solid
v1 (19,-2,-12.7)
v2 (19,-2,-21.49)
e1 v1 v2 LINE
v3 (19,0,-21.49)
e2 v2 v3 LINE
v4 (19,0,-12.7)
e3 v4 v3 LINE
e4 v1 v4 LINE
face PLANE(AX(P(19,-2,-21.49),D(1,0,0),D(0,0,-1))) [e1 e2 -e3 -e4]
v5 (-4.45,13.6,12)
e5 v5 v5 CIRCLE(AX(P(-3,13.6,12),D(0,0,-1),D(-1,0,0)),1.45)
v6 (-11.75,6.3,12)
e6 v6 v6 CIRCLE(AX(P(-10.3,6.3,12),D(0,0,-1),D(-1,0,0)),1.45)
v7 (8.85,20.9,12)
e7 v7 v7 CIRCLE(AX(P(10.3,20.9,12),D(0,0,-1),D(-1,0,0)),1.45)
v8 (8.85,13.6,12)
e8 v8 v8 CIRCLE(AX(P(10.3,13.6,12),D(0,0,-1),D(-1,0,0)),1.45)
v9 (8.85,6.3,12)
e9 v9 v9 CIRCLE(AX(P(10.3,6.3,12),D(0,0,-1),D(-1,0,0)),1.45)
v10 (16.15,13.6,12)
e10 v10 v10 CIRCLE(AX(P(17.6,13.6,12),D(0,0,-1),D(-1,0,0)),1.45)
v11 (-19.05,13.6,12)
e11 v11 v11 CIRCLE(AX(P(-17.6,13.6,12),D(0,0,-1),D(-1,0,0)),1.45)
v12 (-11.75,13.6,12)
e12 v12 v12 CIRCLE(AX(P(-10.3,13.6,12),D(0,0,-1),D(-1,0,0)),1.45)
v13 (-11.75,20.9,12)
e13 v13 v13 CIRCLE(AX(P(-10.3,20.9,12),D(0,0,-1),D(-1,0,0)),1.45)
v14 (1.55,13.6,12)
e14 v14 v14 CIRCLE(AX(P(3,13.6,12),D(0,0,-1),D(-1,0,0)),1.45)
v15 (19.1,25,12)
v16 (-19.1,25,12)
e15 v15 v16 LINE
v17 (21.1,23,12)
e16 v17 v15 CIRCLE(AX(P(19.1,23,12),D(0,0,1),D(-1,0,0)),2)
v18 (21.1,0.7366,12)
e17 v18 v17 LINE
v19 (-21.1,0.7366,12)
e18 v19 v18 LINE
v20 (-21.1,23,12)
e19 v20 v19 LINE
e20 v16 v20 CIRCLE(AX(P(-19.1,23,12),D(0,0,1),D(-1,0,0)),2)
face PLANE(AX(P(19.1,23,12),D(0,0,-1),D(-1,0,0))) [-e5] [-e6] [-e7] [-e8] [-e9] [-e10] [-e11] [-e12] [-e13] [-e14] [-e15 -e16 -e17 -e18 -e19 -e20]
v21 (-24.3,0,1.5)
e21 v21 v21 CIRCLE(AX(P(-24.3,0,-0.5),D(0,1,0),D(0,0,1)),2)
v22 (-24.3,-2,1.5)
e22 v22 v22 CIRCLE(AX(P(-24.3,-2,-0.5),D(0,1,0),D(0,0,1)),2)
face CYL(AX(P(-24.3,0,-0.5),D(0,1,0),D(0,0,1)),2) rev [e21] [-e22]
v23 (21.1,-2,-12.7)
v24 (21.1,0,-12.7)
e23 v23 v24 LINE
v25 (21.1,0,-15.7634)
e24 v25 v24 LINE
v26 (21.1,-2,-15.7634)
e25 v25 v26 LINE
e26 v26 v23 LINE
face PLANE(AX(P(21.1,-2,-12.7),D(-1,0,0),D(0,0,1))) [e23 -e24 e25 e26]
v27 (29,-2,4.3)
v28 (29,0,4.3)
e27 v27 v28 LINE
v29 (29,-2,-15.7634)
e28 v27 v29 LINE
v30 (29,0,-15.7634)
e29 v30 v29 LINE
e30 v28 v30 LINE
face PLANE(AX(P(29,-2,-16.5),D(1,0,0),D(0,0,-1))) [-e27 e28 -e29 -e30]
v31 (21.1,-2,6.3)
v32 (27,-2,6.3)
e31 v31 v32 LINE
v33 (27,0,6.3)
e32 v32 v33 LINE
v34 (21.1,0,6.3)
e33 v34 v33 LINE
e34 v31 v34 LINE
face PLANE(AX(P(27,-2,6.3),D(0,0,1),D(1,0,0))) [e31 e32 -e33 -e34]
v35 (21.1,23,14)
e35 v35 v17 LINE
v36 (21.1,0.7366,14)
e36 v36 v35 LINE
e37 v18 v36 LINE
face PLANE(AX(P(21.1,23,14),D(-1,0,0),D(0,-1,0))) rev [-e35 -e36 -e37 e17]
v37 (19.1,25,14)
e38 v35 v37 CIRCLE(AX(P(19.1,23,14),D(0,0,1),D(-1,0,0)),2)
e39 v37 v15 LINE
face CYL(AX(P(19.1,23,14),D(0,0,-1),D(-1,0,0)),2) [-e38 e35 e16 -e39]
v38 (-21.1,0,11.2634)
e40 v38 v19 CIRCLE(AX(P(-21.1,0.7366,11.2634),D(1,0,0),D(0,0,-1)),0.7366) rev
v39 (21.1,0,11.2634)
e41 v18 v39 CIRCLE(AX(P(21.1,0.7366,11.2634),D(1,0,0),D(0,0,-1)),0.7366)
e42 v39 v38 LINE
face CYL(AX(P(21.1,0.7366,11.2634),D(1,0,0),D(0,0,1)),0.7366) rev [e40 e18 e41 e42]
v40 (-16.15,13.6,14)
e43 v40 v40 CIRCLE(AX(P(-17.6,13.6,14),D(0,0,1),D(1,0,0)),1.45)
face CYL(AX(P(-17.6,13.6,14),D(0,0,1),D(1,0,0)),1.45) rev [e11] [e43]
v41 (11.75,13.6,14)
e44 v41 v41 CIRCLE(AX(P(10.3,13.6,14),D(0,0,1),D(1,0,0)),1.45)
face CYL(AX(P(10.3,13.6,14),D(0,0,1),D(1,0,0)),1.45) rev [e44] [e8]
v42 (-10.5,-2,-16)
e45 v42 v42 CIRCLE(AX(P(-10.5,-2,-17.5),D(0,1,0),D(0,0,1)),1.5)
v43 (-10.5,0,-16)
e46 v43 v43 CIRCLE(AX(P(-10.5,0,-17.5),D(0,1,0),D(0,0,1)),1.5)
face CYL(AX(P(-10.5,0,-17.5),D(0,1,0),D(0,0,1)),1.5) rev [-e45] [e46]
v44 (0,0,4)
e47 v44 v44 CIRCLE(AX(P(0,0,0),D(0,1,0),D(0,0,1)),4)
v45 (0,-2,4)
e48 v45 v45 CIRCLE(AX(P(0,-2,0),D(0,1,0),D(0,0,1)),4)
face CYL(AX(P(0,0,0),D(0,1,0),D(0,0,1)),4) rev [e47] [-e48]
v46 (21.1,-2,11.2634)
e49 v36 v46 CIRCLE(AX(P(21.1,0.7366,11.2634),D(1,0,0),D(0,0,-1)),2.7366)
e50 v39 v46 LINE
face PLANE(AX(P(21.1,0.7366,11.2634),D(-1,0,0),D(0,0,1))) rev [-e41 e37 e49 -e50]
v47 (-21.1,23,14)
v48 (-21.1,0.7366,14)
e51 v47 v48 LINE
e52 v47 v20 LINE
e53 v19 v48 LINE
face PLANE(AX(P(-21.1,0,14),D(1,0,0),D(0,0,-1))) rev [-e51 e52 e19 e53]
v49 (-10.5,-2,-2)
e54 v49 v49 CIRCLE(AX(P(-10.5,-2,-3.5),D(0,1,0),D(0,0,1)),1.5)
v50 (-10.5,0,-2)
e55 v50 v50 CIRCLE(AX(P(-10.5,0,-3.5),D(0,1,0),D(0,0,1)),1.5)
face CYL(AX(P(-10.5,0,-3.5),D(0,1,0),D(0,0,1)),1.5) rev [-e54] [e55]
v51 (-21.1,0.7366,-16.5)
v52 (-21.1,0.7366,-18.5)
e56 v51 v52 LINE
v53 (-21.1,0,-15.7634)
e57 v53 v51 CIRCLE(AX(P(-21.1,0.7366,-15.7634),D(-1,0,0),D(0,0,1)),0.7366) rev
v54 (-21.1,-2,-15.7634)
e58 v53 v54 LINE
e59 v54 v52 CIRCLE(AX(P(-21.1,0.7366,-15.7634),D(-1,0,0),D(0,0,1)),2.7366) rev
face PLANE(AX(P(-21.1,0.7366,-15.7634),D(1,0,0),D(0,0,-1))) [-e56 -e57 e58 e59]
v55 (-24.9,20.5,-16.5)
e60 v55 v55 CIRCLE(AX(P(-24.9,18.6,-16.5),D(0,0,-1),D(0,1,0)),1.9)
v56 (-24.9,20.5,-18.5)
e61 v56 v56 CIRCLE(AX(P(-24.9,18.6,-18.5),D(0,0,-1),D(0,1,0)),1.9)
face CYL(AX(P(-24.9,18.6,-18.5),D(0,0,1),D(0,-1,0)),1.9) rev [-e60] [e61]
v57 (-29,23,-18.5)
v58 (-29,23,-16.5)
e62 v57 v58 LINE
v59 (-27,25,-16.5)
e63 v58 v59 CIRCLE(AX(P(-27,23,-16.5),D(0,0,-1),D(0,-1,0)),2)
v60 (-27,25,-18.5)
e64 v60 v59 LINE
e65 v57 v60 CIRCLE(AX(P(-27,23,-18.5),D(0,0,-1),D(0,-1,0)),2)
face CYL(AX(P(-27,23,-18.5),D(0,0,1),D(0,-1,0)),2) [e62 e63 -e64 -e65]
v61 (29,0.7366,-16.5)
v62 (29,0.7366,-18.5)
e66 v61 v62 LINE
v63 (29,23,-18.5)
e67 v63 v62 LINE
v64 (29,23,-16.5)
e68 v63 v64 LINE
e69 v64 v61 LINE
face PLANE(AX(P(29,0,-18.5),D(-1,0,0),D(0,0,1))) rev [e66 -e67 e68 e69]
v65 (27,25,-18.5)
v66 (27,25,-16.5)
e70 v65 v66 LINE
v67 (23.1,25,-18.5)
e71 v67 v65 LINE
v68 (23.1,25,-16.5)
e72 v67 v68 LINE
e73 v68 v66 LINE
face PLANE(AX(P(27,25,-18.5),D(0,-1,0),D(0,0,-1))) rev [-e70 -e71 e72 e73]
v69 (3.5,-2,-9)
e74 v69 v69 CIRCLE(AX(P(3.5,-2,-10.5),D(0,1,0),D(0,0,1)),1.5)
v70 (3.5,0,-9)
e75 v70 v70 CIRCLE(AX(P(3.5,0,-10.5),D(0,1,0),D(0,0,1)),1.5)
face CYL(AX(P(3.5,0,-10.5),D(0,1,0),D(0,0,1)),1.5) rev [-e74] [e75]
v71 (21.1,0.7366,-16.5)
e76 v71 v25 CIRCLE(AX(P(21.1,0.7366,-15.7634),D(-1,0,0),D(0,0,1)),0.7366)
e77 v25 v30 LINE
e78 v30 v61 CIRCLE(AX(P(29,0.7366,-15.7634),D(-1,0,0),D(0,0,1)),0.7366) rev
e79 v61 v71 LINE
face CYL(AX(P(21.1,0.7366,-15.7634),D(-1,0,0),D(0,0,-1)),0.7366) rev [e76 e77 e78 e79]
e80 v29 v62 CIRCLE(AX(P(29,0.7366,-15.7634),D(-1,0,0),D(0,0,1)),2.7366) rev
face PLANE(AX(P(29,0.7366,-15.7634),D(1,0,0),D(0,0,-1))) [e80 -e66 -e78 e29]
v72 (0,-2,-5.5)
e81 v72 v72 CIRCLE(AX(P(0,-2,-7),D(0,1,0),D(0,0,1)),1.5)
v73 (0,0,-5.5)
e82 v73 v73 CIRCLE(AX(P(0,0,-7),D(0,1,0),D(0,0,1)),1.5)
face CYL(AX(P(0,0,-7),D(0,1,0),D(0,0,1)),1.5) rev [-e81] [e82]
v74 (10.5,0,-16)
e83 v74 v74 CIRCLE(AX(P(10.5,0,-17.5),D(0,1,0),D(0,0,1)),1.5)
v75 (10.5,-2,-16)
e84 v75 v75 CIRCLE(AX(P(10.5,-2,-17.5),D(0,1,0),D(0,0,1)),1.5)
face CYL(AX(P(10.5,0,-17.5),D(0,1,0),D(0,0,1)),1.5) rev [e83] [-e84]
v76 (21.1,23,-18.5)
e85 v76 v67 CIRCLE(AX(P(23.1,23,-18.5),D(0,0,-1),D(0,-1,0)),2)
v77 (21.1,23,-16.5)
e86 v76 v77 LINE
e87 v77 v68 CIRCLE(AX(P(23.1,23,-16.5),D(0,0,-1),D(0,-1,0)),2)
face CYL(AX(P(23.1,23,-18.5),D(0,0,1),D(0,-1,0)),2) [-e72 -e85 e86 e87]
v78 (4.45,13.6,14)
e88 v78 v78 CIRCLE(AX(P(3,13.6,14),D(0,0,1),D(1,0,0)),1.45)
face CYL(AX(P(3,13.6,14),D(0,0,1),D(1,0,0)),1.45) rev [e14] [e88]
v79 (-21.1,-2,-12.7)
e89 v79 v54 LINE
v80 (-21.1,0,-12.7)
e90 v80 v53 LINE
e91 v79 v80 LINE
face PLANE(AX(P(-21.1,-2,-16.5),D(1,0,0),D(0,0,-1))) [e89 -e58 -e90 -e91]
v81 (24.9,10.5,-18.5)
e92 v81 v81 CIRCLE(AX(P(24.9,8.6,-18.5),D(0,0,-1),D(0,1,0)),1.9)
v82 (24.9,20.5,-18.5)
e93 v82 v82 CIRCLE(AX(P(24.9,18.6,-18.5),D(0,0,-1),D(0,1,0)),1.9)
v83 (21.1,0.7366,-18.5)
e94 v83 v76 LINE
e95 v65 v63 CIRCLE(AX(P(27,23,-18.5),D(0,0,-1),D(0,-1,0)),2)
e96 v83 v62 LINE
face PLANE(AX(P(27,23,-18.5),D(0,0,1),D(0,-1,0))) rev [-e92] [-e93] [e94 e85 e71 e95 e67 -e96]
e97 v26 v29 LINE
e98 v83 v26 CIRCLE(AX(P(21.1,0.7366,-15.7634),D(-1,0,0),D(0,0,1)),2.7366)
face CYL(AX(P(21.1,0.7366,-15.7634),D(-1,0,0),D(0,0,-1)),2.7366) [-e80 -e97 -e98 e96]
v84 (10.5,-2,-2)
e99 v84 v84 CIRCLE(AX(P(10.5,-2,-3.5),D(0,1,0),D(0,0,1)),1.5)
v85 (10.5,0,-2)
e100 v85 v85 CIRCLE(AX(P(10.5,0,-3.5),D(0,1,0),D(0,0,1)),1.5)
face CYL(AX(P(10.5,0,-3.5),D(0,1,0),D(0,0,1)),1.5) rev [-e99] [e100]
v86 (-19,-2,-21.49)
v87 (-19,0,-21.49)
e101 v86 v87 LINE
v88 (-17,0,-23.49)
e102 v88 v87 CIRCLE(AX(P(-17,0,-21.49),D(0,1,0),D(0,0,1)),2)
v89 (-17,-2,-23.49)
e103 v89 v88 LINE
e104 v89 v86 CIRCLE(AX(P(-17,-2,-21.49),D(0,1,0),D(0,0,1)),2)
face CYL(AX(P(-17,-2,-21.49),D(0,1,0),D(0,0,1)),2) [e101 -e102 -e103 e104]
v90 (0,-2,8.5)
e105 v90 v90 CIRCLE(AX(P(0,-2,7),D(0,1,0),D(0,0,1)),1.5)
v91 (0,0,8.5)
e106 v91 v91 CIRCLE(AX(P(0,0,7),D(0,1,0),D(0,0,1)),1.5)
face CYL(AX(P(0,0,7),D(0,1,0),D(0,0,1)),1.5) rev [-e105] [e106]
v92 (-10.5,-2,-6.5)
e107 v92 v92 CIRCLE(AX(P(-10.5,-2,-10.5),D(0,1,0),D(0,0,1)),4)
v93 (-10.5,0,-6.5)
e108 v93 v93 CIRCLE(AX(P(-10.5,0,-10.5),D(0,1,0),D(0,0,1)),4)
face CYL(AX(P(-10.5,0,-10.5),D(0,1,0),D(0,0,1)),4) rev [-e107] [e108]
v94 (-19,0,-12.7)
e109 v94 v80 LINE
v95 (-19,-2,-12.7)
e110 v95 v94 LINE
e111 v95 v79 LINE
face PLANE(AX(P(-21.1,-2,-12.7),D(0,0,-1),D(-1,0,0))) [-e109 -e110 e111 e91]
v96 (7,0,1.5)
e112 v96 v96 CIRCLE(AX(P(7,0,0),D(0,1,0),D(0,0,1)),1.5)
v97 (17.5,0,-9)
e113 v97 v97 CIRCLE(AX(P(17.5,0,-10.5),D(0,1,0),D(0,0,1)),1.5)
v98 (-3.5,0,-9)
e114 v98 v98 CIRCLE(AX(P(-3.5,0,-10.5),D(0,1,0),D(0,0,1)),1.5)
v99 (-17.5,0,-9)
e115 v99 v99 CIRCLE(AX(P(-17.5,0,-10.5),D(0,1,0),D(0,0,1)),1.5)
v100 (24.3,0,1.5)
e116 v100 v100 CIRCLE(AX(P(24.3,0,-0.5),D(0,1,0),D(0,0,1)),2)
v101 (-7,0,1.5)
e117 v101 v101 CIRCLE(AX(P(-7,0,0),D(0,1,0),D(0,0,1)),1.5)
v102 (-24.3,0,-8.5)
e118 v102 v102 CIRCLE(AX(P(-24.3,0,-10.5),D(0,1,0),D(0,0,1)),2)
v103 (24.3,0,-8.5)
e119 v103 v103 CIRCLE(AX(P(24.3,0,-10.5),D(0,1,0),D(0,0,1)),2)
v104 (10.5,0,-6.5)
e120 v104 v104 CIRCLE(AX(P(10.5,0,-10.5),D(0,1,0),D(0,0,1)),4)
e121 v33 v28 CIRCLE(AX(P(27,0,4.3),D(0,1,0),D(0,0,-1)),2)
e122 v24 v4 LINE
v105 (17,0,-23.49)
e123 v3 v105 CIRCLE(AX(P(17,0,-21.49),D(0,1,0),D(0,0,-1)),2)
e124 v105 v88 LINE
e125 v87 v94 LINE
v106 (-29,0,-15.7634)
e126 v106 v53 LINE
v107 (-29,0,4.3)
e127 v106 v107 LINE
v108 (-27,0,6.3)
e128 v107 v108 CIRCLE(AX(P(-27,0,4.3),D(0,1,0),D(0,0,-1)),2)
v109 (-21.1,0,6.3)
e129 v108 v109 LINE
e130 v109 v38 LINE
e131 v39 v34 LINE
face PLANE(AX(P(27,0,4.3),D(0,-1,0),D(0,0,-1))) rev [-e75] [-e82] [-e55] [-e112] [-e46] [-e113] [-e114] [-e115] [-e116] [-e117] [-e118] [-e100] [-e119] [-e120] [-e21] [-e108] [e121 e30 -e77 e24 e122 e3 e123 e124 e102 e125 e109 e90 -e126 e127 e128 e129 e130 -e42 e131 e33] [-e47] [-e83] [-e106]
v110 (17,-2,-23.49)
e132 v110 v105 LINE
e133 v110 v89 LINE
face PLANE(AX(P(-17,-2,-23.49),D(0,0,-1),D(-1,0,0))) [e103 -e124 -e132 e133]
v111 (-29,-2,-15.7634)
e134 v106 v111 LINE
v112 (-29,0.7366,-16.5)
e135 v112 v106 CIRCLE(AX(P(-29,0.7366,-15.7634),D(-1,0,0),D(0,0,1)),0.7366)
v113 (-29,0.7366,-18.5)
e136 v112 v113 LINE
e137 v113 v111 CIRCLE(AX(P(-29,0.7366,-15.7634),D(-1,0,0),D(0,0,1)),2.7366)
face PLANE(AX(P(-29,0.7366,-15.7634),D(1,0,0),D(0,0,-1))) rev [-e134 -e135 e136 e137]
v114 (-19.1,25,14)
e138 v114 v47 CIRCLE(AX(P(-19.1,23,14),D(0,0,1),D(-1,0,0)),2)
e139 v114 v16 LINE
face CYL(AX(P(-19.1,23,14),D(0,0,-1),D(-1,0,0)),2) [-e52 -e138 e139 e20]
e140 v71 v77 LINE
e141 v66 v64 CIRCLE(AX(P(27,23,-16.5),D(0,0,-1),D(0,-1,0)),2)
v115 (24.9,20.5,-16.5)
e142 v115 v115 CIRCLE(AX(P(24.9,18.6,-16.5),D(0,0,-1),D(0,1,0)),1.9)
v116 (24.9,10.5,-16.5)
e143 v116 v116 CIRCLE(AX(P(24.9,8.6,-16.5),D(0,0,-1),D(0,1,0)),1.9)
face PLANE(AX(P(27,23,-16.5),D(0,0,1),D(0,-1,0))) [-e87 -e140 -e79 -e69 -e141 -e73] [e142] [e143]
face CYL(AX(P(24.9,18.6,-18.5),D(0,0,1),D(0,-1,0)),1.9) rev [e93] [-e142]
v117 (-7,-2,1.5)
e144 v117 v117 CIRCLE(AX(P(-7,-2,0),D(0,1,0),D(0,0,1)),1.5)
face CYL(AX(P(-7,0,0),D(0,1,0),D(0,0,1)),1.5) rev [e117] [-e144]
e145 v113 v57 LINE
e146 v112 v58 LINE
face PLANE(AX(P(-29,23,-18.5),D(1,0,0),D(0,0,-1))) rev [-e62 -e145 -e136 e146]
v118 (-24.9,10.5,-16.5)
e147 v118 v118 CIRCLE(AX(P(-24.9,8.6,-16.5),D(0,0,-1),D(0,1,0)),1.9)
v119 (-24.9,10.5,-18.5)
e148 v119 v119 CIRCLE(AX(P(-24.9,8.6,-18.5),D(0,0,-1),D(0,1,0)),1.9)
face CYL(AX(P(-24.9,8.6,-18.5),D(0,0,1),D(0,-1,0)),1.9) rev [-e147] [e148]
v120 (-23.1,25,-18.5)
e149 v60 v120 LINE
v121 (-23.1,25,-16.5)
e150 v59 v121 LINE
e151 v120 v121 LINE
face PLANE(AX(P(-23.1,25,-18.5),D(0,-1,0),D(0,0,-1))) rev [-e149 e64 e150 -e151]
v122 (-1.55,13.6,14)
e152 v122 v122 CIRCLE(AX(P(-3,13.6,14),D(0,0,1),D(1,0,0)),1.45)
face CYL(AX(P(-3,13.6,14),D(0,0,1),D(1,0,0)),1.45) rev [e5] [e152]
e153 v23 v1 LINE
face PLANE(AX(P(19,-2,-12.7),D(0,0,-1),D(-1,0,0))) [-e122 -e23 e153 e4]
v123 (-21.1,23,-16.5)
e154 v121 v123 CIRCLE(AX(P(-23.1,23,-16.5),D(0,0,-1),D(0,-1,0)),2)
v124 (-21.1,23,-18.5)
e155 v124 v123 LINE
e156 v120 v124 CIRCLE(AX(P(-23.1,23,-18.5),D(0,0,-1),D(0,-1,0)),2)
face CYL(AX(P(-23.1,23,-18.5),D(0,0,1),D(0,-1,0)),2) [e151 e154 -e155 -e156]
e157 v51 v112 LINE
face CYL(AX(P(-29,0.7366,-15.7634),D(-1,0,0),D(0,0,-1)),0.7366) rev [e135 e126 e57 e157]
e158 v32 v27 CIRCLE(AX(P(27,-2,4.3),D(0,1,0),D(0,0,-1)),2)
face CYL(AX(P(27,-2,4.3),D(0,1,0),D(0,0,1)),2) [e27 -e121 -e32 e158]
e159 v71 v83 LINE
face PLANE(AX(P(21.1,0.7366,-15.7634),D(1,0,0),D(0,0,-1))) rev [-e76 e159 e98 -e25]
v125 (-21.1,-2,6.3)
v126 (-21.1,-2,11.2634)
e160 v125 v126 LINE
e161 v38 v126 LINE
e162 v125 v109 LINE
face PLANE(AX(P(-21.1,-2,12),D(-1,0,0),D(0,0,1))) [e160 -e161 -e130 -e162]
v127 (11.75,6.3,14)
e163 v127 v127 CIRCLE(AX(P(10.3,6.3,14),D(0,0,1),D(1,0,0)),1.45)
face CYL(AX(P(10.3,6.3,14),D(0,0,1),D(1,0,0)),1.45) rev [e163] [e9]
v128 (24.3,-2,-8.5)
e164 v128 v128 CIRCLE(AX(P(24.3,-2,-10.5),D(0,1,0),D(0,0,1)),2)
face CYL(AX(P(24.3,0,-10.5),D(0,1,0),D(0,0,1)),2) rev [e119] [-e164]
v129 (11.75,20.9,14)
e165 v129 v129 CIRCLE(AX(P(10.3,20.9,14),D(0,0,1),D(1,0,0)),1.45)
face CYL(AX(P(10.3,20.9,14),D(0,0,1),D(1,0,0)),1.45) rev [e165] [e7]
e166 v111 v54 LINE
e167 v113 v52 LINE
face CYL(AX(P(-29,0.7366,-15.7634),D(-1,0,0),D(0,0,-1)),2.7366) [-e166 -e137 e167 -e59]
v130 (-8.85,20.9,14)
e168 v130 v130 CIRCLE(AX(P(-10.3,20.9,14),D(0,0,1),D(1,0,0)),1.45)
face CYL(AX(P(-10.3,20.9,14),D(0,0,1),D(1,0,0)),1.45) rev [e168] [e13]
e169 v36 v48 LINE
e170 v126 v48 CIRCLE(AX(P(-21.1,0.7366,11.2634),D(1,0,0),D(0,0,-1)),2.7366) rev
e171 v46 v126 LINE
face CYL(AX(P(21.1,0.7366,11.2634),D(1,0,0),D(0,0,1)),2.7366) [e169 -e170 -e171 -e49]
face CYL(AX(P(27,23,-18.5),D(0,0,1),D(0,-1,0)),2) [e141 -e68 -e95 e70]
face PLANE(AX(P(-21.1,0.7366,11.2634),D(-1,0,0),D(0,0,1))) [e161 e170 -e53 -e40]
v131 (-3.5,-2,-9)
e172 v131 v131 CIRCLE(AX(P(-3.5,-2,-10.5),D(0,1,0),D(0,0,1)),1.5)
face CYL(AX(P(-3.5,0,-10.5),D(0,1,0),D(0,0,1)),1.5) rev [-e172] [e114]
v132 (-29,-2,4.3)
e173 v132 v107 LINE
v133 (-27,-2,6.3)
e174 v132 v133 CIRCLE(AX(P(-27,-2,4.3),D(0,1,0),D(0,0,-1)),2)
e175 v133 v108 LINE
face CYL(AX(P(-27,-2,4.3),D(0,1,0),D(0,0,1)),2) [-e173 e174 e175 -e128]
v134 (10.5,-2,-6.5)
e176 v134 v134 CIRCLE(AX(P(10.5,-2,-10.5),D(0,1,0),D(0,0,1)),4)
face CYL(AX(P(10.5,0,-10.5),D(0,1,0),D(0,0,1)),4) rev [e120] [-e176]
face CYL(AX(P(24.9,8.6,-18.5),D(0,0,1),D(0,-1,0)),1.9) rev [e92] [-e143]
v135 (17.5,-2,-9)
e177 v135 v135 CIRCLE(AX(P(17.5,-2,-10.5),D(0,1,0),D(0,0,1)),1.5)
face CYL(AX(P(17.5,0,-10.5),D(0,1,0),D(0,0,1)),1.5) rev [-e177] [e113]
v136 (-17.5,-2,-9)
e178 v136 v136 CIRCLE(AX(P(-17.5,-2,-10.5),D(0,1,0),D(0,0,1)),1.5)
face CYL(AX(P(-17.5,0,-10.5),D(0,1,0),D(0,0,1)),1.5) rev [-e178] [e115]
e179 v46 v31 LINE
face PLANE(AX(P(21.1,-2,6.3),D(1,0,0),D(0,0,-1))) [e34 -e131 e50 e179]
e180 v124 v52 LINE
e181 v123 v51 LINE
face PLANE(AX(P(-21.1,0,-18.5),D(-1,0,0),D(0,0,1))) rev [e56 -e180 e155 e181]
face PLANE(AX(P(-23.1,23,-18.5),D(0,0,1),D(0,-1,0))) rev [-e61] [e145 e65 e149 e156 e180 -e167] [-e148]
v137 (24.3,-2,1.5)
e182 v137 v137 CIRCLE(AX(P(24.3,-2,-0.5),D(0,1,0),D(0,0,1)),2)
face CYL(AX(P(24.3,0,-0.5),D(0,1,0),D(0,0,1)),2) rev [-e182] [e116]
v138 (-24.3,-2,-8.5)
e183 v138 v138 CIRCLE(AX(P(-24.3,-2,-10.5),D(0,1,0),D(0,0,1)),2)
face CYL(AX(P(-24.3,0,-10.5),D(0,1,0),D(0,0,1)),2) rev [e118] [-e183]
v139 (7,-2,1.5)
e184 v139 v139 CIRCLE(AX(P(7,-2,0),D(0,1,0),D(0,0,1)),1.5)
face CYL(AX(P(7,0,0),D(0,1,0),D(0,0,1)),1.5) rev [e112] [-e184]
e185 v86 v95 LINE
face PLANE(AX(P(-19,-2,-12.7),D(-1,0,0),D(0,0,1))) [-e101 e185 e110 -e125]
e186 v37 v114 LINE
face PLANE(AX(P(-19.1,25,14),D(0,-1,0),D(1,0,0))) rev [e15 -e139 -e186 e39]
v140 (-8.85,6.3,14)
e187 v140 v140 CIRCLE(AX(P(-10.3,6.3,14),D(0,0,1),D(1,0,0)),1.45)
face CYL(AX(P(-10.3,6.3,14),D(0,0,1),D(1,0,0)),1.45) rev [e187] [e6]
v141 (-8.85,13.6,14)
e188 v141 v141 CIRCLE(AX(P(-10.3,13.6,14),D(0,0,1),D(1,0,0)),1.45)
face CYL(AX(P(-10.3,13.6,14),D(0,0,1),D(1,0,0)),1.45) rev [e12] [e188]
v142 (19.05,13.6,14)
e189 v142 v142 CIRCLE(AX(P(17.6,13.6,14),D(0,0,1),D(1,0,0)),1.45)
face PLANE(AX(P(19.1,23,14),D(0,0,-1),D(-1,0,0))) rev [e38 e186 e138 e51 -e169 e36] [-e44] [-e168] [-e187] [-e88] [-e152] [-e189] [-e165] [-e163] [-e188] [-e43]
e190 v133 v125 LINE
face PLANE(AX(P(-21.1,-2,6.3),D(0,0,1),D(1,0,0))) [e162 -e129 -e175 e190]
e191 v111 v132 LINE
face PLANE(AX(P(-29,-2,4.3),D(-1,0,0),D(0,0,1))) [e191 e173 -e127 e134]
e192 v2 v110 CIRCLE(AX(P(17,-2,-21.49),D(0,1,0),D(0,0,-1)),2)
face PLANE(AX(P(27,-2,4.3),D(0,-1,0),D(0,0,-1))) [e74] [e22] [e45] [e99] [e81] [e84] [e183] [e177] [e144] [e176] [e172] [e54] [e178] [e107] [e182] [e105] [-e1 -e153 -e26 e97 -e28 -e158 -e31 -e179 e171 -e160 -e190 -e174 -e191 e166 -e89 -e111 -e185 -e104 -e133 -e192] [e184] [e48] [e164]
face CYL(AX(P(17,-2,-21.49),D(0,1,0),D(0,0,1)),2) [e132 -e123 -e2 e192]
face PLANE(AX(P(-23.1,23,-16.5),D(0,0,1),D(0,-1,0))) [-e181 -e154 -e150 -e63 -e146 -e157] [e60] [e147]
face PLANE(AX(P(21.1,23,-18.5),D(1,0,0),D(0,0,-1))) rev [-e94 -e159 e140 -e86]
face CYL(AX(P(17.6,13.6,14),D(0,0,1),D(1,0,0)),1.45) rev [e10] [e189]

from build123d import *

# Parameters (mm, degrees)
SM_BASE_FLANGE_1_DEPTH             = 2
SM_EDGE_FLANGE_1_STRIP_W           = 9.4732
SM_EDGE_FLANGE_1_STRIP_H           = 2
SM_EDGE_FLANGE_1_STRIP_CUT_DEPTH   = 42.2
SM_EDGE_FLANGE_1_DEPTH             = 42.2
SM_START                           = 2
SM_EDGE_FLANGE_1_FLAT_DEPTH        = 2
SM_EDGE_FLANGE_2_STRIP_W           = 9.4732
SM_EDGE_FLANGE_2_STRIP_H           = 2
SM_EDGE_FLANGE_2_STRIP_CUT_DEPTH   = 7.9
SM_EDGE_FLANGE_2_STRIP_2_W         = 9.4732
SM_EDGE_FLANGE_2_STRIP_2_H         = 2
SM_EDGE_FLANGE_2_STRIP_CUT_2_DEPTH = 7.9
SM_EDGE_FLANGE_2_DEPTH             = 7.9
SM_EDGE_FLANGE_2_PROFILE_R         = 1.9
SM_EDGE_FLANGE_2_FLAT_DEPTH        = 2
SM_EDGE_FLANGE_2_BEND_DEPTH        = 7.9
SM_EDGE_FLANGE_2_PROFILE_2_R       = 1.9
SM_EDGE_FLANGE_2_FLAT_2_DEPTH      = 2
HOLE_WIZARD_8_0_8_1_D              = 8
HOLE_WIZARD_3_0_3_1_D              = 3
HOLE_WIZARD_4_0_4_1_D              = 4
HOLE_WIZARD_2_9_2_9_2_D            = 2.9


# Sheet-metal steps are written as plain solids
with BuildPart() as part:
    # Sketch 2 → 基体-法兰1 (new body)
    with BuildSketch(Plane(origin=(0, 0, 0), x_dir=(1, 0, 0), z_dir=(0, 1, 0))):
        with BuildLine():
            Line((-17, 23.49), (17, 23.49))
            ThreePointArc((17, 23.49), (18.414213562, 22.904213562), (19, 21.49))
            Line((19, 21.49), (19, 12.7))
            Line((19, 12.7), (21.1, 12.7))
            Line((21.1, 12.7), (21.1, 16.5))
            Line((21.1, 16.5), (29, 16.5))
            Line((29, 16.5), (29, -4.3))
            ThreePointArc((29, -4.3), (28.414213562, -5.714213562), (27, -6.3))
            Line((27, -6.3), (21.1, -6.3))
            Line((21.1, -6.3), (21.1, -12))
            Line((21.1, -12), (-21.1, -12))
            Line((-21.1, -12), (-21.1, -6.3))
            Line((-21.1, -6.3), (-27, -6.3))
            ThreePointArc((-27, -6.3), (-28.414213562, -5.714213562), (-29, -4.3))
            Line((-29, -4.3), (-29, 16.5))
            Line((-29, 16.5), (-21.1, 16.5))
            Line((-21.1, 16.5), (-21.1, 12.7))
            Line((-21.1, 12.7), (-19, 12.7))
            Line((-19, 12.7), (-19, 21.49))
            ThreePointArc((-19, 21.49), (-18.414213562, 22.904213562), (-17, 23.49))
        make_face()
    extrude(amount=-SM_BASE_FLANGE_1_DEPTH)

    # 边线-法兰1 strip (across the edge) → 边线-法兰1 strip cut (cut)
    with BuildSketch(Plane(origin=(-21.1, 0, 12), x_dir=(0, 0, -1), z_dir=(1, 0, 0))):
        with Locations((-4, -1)):
            Rectangle(SM_EDGE_FLANGE_1_STRIP_W, SM_EDGE_FLANGE_1_STRIP_H)
    extrude(amount=SM_EDGE_FLANGE_1_STRIP_CUT_DEPTH, mode=Mode.SUBTRACT)

    # 边线-法兰1 bend section (across the edge) → 边线-法兰1 (add)
    with BuildSketch(Plane(origin=(-21.1, 0, 12), x_dir=(0, 0, -1), z_dir=(1, 0, 0))):
        with BuildLine():
            Line((-2, 0.7366), (0, 0.7366))
            ThreePointArc((0, 0.7366), (0.215745145, 0.215745145), (0.7366, 0))
            Line((0.7366, 0), (0.7366, -2))
            ThreePointArc((0.7366, -2), (-1.198468417, -1.198468417), (-2, 0.7366))
        make_face()
    extrude(amount=SM_EDGE_FLANGE_1_DEPTH)

    # 边线-法兰1 profile (on flange) → 边线-法兰1 flat (add)
    with BuildSketch(Plane.XY.offset(12).offset(SM_START)):
        with BuildLine():
            Line((-21.1, 0.7366), (21.1, 0.7366))
            Line((21.1, 0.7366), (21.1, 23))
            ThreePointArc((21.1, 23), (20.514213562, 24.414213562), (19.1, 25))
            Line((19.1, 25), (-19.1, 25))
            ThreePointArc((-19.1, 25), (-20.514213562, 24.414213562), (-21.1, 23))
            Line((-21.1, 23), (-21.1, 0.7366))
        make_face()
    extrude(amount=-SM_EDGE_FLANGE_1_FLAT_DEPTH)

    # 边线-法兰2 strip (across the edge) → 边线-法兰2 strip cut (cut)
    with BuildSketch(Plane(origin=(-21.1, 0, -16.5), x_dir=(0, 0, 1), z_dir=(-1, 0, 0))):
        with Locations((-4, -1)):
            Rectangle(SM_EDGE_FLANGE_2_STRIP_W, SM_EDGE_FLANGE_2_STRIP_H)
    extrude(amount=SM_EDGE_FLANGE_2_STRIP_CUT_DEPTH, mode=Mode.SUBTRACT)

    # 边线-法兰2 strip 2 (across the edge) → 边线-法兰2 strip cut 2 (cut)
    with BuildSketch(Plane(origin=(29, 0, -16.5), x_dir=(0, 0, 1), z_dir=(-1, 0, 0))):
        with Locations((-4, -1)):
            Rectangle(SM_EDGE_FLANGE_2_STRIP_2_W, SM_EDGE_FLANGE_2_STRIP_2_H)
    extrude(amount=SM_EDGE_FLANGE_2_STRIP_CUT_2_DEPTH, mode=Mode.SUBTRACT)

    # 边线-法兰2 bend section (across the edge) → 边线-法兰2 (add)
    with BuildSketch(Plane(origin=(-21.1, 0, -16.5), x_dir=(0, 0, 1), z_dir=(-1, 0, 0))):
        with BuildLine():
            Line((-2, 0.7366), (0, 0.7366))
            ThreePointArc((0, 0.7366), (0.215745145, 0.215745145), (0.7366, 0))
            Line((0.7366, 0), (0.7366, -2))
            ThreePointArc((0.7366, -2), (-1.198468417, -1.198468417), (-2, 0.7366))
        make_face()
    extrude(amount=SM_EDGE_FLANGE_2_DEPTH)

    # 边线-法兰2 profile (on flange) → 边线-法兰2 flat (add)
    with BuildSketch(Plane(origin=(0, 0, -16.5), x_dir=(-1, 0, 0), z_dir=(0, 0, -1)).offset(SM_START)):
        with BuildLine():
            ThreePointArc((23.1, 25), (21.685786438, 24.414213562), (21.1, 23))
            Line((21.1, 23), (21.1, 0.7366))
            Line((21.1, 0.7366), (29, 0.7366))
            Line((29, 0.7366), (29, 23))
            ThreePointArc((29, 23), (28.414213562, 24.414213562), (27, 25))
            Line((27, 25), (23.1, 25))
        make_face()
        with Locations((24.9, 8.6)):
            Circle(SM_EDGE_FLANGE_2_PROFILE_R, mode=Mode.SUBTRACT)
        with Locations((24.9, 18.6)):
            Circle(SM_EDGE_FLANGE_2_PROFILE_R, mode=Mode.SUBTRACT)
    extrude(amount=-SM_EDGE_FLANGE_2_FLAT_DEPTH)

    # 边线-法兰2 bend section 2 (across the edge) → 边线-法兰2 bend (add)
    with BuildSketch(Plane(origin=(29, 0, -16.5), x_dir=(0, 0, 1), z_dir=(-1, 0, 0))):
        with BuildLine():
            Line((-2, 0.7366), (0, 0.7366))
            ThreePointArc((0, 0.7366), (0.215745145, 0.215745145), (0.7366, 0))
            Line((0.7366, 0), (0.7366, -2))
            ThreePointArc((0.7366, -2), (-1.198468417, -1.198468417), (-2, 0.7366))
        make_face()
    extrude(amount=SM_EDGE_FLANGE_2_BEND_DEPTH)

    # 边线-法兰2 profile 2 (on flange) → 边线-法兰2 flat 2 (add)
    with BuildSketch(Plane(origin=(0, 0, -16.5), x_dir=(-1, 0, 0), z_dir=(0, 0, -1)).offset(SM_START)):
        with BuildLine():
            Line((-29, 23), (-29, 0.7366))
            Line((-29, 0.7366), (-21.1, 0.7366))
            Line((-21.1, 0.7366), (-21.1, 23))
            ThreePointArc((-21.1, 23), (-21.685786438, 24.414213562), (-23.1, 25))
            Line((-23.1, 25), (-27, 25))
            ThreePointArc((-27, 25), (-28.414213562, 24.414213562), (-29, 23))
        make_face()
        with Locations((-24.9, 8.6)):
            Circle(SM_EDGE_FLANGE_2_PROFILE_2_R, mode=Mode.SUBTRACT)
        with Locations((-24.9, 18.6)):
            Circle(SM_EDGE_FLANGE_2_PROFILE_2_R, mode=Mode.SUBTRACT)
    extrude(amount=-SM_EDGE_FLANGE_2_FLAT_2_DEPTH)

    # Ø8.0 (8) 直径孔1 (through all)
    with Locations(Plane(origin=(0, 0, 0), x_dir=(1, 0, 0), z_dir=(0, 1, 0))):
        with Locations((0, 0), (-10.5, 10.5), (10.5, 10.5)):
            Hole(HOLE_WIZARD_8_0_8_1_D / 2)

    # Ø3.0 (3) 直径孔1 (through all)
    with Locations(Plane(origin=(0, 0, 0), x_dir=(1, 0, 0), z_dir=(0, 1, 0))):
        with Locations((0, -7), (-17.5, 10.5), (17.5, 10.5), (-3.5, 10.5), (-10.5, 17.5), (-10.5, 3.5), (0, 7), (-7, 0), (7, 0), (10.5, 3.5), (3.5, 10.5), (10.5, 17.5)):
            Hole(HOLE_WIZARD_3_0_3_1_D / 2)

    # Ø4.0 (4) 直径孔1 (through all)
    with Locations(Plane(origin=(0, 0, 0), x_dir=(1, 0, 0), z_dir=(0, 1, 0))):
        with Locations((-24.3, 10.5), (-24.3, 0.5), (24.3, 10.5), (24.3, 0.5)):
            Hole(HOLE_WIZARD_4_0_4_1_D / 2)

    # Ø2.9 (2.9) 直径孔2 (through all)
    with Locations(Plane.XY.offset(14)):
        with Locations((10.3, 13.6), (-10.3, 13.6), (-10.3, 20.9), (-17.6, 13.6), (-10.3, 6.3), (-3, 13.6), (3, 13.6), (10.3, 20.9), (10.3, 6.3), (17.6, 13.6)):
            Hole(HOLE_WIZARD_2_9_2_9_2_D / 2)


solid = part.part
